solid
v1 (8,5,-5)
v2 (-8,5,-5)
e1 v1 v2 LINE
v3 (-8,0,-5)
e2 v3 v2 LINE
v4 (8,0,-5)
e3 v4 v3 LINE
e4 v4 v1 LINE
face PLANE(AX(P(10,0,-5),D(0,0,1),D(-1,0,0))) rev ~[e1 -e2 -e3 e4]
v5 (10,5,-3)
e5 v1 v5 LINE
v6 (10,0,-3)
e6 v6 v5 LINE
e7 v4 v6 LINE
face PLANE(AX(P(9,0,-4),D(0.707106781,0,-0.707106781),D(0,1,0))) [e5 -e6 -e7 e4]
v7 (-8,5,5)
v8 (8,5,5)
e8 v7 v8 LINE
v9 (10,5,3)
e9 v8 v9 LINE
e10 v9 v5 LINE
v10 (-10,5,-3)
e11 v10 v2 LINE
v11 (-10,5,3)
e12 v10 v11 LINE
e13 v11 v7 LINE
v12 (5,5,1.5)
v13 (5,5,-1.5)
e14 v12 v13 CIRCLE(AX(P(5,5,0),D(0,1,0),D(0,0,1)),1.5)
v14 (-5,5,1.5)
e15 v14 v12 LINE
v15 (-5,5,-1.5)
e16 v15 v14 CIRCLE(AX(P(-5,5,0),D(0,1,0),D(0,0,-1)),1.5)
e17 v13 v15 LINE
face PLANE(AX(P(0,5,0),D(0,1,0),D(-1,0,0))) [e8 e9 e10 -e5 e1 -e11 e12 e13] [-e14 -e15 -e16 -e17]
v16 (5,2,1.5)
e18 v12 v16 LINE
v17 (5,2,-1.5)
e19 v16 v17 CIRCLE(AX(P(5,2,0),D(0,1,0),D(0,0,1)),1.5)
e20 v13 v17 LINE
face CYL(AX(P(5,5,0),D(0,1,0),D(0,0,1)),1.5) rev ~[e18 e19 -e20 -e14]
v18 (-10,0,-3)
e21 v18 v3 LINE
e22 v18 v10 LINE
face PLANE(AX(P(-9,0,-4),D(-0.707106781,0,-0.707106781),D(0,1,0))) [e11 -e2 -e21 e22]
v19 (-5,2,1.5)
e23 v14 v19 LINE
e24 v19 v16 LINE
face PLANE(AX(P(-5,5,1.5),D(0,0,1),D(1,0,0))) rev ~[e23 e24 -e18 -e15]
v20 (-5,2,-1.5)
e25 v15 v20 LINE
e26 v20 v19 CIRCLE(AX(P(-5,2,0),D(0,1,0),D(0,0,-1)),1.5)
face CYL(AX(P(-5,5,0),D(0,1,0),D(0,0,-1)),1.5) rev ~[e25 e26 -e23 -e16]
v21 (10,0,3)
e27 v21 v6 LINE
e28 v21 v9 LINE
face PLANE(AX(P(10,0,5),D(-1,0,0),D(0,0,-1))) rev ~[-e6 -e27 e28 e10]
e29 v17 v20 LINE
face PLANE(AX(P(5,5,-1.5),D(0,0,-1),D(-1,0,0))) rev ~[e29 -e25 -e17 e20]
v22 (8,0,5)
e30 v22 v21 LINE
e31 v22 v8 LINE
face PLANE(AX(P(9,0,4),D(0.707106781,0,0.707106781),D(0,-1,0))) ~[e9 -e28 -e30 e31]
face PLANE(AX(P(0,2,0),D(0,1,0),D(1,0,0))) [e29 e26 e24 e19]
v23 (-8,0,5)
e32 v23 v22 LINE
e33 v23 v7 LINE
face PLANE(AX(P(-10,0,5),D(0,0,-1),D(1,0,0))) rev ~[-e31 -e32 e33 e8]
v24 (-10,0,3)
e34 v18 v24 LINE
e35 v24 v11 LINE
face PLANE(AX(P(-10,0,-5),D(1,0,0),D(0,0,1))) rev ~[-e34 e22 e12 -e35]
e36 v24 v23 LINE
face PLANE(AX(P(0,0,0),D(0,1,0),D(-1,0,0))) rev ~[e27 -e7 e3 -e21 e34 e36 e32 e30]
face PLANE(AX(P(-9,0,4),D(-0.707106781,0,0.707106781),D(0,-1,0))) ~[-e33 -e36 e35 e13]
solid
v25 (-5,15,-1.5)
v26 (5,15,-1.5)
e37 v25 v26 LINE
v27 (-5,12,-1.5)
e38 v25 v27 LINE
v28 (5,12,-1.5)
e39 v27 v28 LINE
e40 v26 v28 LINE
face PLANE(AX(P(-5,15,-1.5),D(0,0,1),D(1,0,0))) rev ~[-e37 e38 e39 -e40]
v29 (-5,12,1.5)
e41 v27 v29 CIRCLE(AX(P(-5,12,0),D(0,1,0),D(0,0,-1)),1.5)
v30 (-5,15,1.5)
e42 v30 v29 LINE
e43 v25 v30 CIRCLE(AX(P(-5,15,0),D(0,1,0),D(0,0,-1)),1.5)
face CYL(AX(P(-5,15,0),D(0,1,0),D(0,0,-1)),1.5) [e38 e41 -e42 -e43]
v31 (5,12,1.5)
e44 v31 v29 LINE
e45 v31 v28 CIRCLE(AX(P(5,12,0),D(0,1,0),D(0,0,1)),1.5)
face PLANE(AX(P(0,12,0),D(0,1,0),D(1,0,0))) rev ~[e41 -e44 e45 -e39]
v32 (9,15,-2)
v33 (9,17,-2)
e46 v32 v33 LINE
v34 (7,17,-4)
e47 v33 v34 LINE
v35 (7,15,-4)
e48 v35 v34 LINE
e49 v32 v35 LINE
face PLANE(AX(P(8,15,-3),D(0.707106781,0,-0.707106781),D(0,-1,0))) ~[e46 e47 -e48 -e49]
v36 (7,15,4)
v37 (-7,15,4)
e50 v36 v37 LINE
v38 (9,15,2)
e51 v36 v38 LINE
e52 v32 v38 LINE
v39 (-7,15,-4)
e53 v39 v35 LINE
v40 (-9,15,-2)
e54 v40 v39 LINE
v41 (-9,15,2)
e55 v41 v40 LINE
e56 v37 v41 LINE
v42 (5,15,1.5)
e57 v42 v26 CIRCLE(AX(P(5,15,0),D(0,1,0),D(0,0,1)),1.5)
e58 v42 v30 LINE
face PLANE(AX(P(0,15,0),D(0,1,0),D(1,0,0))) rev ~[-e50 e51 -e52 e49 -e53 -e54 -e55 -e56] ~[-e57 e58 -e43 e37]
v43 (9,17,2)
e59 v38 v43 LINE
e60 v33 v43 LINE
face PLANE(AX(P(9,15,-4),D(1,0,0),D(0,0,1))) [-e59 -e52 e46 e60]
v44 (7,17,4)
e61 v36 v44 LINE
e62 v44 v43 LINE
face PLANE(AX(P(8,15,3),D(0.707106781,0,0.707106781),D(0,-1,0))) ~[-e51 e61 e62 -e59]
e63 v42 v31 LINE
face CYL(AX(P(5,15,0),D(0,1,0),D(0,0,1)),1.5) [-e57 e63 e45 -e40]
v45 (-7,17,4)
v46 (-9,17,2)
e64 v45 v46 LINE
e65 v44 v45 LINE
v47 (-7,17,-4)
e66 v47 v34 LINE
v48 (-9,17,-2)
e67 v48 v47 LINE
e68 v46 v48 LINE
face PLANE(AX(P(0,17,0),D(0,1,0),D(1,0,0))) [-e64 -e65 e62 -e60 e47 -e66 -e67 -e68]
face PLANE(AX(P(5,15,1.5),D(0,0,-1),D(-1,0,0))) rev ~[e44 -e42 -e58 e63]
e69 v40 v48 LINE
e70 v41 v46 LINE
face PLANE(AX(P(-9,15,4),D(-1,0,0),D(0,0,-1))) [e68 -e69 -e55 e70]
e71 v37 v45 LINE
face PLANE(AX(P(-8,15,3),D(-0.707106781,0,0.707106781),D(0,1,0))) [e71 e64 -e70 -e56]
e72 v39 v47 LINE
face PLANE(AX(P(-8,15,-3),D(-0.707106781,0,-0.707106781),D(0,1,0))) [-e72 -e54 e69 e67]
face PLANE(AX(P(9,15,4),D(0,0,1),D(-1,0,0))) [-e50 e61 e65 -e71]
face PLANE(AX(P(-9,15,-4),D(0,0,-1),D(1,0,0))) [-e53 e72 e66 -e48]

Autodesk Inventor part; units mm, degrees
ref_plane "YZ Plane" through (0, 0, 0) normal (1, 0, 0) x (0, 1, 0)
ref_plane "XZ Plane" through (0, 0, 0) normal (0, 1, 0) x (-1, 0, 0)
ref_plane "XY Plane" through (0, 0, 0) normal (0, 0, 1) x (1, 0, 0)
sketch "Sketch1" plane through (0, 0, 0) normal (0, 1, 0) x (-1, 0, 0)
  line L0 (10, 5) -> (-10, 5)
  line L1 (-10, 5) -> (-10, -5)
  line L2 (-10, -5) -> (10, -5)
  line L3 (10, -5) -> (10, 5)
  line L4 (10, 5) -> (-10, -5) construction
  line L5 (-10, 5) -> (10, -5) construction
  point P0 (0, 0)
  dimension "d0" = 20
  dimension "d1" = 10
extrude "Extrusion1" add sketch "Sketch1" along normal blind 5
sketch "Sketch2" plane through (0, 5, 0) normal (0, 1, 0) x (1, 0, 0)
  line L0 (-5, 0) -> (5, 0) construction
  line L1 (-5, -1.5) -> (5, -1.5)
  line L2 (5, 1.5) -> (-5, 1.5)
  arc A0 (-5, 1.5) -> (-5, -1.5) centre (-5, 0) ccw
  arc A1 (5, -1.5) -> (5, 1.5) centre (5, 0) ccw
  point P0 (0, 0)
  dimension "d4" = 5
  dimension "d5" = 3
extrude "Extrusion2" cut sketch "Sketch2" against normal blind 3
ref_plane "Work Plane1" through (0, 15, 0) normal (0, 1, 0) x (1, 0, 0)
sketch "Sketch3" plane through (0, 15, 0) normal (0, 1, 0) x (1, 0, 0)
  line L0 (-10, -5) -> (10, -5) projected
  line L1 (10, -5) -> (10, 5) projected
  line L2 (10, 5) -> (-10, 5) projected
  line L3 (-10, 5) -> (-10, -5) projected
  line L4 (5, -1.5) -> (-5, -1.5) projected
  arc A0 (5, -1.5) -> (5, 1.5) centre (5, 0) ccw projected
  line L5 (-5, 1.5) -> (5, 1.5) projected
  arc A1 (-5, 1.5) -> (-5, -1.5) centre (-5, 0) ccw projected
  point P0 (0, 0)
extrude "Extrusion3" add sketch "Sketch3" against normal blind 3 contours L4 A1 L5 A0
sketch "Sketch4" plane through (0, 15, 0) normal (0, 1, 0) x (1, 0, 0)
  line L0 (9, -4) -> (-9, -4)
  line L1 (-9, -4) -> (-9, 4)
  line L2 (-9, 4) -> (9, 4)
  line L3 (9, 4) -> (9, -4)
  line L4 (9, -4) -> (-9, 4) construction
  line L5 (-9, -4) -> (9, 4) construction
  point P0 (0, 0)
  dimension "d12" = 18
  dimension "d13" = 8
chamfer "Chamfer1" distance 2 angle 45 4 edges at (-10, 2.5, -5) (-10, 2.5, 5) (10, 2.5, -5) (10, 2.5, 5)
extrude "Extrusion4" add sketch "Sketch4" along normal blind 2
chamfer "Chamfer2" distance 2 angle 45 4 edges at (-9, 16, -4) (-9, 16, 4) (9, 16, 4) (9, 16, -4)
ref_plane "Work Plane2" through (0, 10, 0) normal (0, 1, 0) x (1, 0, 0)
split body "Split1" result two bodies by plane through (0, 10, 0) normal (0, 1, 0) first body at (-2.3333, 16.5, 1.3333)
properties part number "test_slot"
